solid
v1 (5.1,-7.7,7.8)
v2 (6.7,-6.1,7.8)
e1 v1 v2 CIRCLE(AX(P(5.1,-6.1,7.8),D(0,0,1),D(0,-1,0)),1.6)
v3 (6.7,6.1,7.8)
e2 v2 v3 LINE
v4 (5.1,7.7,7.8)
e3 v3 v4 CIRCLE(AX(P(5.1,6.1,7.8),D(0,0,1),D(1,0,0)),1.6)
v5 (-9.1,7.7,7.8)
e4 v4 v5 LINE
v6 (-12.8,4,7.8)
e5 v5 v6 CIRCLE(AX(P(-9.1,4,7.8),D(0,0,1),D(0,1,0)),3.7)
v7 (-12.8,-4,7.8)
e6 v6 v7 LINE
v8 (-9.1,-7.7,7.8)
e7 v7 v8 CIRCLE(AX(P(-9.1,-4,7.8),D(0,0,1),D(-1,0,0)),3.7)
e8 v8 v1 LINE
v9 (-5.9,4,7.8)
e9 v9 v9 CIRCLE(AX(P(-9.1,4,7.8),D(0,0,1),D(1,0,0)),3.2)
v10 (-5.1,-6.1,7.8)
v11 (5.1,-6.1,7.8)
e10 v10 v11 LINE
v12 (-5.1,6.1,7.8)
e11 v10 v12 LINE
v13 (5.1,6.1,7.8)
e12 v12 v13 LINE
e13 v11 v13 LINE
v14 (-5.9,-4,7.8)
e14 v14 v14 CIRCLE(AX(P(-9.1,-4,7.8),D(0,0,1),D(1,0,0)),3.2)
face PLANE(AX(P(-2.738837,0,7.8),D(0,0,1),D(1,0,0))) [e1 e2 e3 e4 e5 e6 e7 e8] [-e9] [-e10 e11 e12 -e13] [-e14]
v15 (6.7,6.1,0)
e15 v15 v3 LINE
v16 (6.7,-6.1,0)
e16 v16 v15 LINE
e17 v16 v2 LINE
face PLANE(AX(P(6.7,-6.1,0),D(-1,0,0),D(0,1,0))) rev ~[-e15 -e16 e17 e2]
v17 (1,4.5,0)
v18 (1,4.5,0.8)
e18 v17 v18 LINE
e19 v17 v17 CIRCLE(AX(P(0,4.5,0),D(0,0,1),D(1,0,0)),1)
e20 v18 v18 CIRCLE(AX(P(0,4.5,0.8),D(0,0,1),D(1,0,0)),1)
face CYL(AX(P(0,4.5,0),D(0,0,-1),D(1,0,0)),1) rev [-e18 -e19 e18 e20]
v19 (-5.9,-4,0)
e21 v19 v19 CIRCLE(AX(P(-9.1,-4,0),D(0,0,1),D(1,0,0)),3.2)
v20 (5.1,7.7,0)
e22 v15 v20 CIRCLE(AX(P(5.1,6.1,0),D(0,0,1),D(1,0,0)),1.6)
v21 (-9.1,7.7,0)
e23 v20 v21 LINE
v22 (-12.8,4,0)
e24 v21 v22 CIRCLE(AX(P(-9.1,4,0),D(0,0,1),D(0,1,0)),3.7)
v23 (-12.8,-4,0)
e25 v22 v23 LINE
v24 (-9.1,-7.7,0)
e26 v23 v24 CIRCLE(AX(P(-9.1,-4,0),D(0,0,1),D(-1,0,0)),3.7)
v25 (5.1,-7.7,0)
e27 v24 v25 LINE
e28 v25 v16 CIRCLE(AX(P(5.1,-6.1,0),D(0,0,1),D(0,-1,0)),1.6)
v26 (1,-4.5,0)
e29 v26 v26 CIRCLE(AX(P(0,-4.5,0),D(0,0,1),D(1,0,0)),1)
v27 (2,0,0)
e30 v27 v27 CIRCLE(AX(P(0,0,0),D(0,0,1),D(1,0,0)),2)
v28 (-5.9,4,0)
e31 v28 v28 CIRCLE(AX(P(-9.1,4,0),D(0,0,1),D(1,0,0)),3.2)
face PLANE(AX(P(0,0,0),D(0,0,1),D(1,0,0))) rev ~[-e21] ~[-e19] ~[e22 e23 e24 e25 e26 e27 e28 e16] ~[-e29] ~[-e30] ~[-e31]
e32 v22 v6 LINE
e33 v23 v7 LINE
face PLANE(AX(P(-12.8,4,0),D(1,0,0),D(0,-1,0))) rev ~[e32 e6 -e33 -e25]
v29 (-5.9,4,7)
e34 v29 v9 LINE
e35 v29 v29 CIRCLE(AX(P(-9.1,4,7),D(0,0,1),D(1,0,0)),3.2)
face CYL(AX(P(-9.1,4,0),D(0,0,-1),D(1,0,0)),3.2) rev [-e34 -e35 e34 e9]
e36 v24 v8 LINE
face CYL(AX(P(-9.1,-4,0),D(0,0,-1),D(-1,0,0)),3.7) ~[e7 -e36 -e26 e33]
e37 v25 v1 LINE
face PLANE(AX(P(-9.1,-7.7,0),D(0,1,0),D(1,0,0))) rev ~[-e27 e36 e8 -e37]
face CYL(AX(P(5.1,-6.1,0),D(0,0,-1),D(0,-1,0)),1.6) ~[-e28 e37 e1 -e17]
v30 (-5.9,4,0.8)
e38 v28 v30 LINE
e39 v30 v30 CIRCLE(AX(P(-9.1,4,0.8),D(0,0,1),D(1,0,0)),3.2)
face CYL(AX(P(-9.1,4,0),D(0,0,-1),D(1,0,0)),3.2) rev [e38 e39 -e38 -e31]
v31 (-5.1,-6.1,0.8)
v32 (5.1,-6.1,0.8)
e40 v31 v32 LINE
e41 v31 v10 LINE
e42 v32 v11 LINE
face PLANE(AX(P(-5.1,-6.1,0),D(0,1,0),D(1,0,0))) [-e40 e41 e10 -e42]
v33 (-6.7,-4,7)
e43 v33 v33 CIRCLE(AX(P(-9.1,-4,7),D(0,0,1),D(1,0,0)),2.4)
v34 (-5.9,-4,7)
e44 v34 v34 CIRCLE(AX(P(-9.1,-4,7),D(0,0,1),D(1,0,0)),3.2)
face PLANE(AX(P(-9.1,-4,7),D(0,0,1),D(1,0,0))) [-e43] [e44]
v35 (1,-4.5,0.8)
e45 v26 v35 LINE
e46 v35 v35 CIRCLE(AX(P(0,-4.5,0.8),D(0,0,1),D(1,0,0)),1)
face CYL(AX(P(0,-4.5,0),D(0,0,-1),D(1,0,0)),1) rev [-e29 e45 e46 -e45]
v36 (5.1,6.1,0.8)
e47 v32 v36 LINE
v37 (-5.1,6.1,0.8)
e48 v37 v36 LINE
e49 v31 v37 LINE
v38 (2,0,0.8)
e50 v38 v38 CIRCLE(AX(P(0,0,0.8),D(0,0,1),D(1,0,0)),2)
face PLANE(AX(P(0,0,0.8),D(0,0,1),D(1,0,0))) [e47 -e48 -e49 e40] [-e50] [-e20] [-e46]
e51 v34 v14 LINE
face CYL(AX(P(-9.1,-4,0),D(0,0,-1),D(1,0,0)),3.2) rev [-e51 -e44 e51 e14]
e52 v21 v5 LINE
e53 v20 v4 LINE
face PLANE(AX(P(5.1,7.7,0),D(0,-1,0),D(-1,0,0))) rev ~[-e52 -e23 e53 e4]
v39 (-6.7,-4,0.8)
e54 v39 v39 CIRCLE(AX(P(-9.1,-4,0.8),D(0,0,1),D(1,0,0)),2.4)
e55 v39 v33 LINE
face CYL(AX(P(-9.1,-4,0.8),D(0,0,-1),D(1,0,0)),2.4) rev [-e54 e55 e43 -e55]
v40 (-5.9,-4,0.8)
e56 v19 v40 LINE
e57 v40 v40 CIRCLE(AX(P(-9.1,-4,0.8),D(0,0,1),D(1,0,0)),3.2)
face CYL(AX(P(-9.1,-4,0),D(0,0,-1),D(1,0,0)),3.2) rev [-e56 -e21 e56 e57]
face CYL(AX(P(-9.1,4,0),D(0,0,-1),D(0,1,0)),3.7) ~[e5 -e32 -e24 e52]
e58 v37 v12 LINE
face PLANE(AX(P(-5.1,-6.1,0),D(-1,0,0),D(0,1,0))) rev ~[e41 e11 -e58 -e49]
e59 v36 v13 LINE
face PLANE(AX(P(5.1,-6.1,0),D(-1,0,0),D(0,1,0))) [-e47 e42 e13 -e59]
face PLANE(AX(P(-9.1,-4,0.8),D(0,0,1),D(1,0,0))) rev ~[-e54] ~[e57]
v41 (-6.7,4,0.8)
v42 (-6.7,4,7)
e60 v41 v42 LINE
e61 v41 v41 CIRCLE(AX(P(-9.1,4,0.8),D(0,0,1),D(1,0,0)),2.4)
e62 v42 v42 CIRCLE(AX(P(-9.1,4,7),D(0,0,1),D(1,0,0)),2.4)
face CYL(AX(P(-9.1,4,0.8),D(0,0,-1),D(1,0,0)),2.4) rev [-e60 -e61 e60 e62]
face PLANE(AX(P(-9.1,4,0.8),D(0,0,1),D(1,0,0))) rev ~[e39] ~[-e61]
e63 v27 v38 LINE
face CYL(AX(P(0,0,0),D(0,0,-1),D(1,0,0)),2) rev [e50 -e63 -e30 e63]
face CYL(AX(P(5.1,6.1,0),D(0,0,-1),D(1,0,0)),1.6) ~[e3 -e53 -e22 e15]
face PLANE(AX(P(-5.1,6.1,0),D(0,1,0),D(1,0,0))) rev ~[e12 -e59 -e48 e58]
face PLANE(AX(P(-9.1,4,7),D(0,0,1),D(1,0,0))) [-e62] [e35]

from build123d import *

# Parameters (mm, degrees)
F0_R     = 3.2
F0_W     = 10.2
F0_H     = 12.2
F1_DEPTH = 7.8
F2_START = 0.8
F0_R_2   = 2.4
F2_DEPTH = 6.2
F0_R_3   = 1
F0_R_4   = 2
F3_DEPTH = 0.8


# Not quite as in the source:
# - a feature names something its author has since deleted; it is built from what else it names


with BuildPart() as f1:
    # F0 (on Top) → F1 (new body)
    with BuildSketch(Plane.XY):
        with BuildLine():
            Line((5.1, 7.7), (-9.1, 7.7))
            ThreePointArc((-9.1, 7.7), (-11.7162950904, 6.6162950904), (-12.8, 4))
            Line((-12.8, 4), (-12.8, -4))
            ThreePointArc((-12.8, -4), (-11.7162950904, -6.6162950904), (-9.1, -7.7))
            Line((-9.1, -7.7), (5.1, -7.7))
            ThreePointArc((5.1, -7.7), (6.2313708499, -7.2313708499), (6.7, -6.1))
            Line((6.7, -6.1), (6.7, 6.1))
            ThreePointArc((6.7, 6.1), (6.2313708499, 7.2313708499), (5.1, 7.7))
        make_face()
        with Locations((-9.1, -4)):
            Circle(F0_R, mode=Mode.SUBTRACT)
        with Locations((-9.1, 4)):
            Circle(F0_R, mode=Mode.SUBTRACT)
        Rectangle(F0_W, F0_H, mode=Mode.SUBTRACT)
    extrude(amount=F1_DEPTH)

    # F0 (on Top) → F2 (join)
    with BuildSketch(Plane.XY.offset(F2_START)):
        with Locations((-9.1, -4)):
            Circle(F0_R)
        with Locations((-9.1, -4)):
            Circle(F0_R_2, mode=Mode.SUBTRACT)
        with Locations((-9.1, 4)):
            Circle(F0_R)
        with Locations((-9.1, 4)):
            Circle(F0_R_2, mode=Mode.SUBTRACT)
    extrude(amount=F2_DEPTH)

    # F0 (on Top) → F3 (join)
    with BuildSketch(Plane.XY):
        Rectangle(F0_W, F0_H)
        with Locations((0, -4.5)):
            Circle(F0_R_3, mode=Mode.SUBTRACT)
        Circle(F0_R_4, mode=Mode.SUBTRACT)
        with Locations((0, 4.5)):
            Circle(F0_R_3, mode=Mode.SUBTRACT)
    extrude(amount=F3_DEPTH)


solid = f1.part
